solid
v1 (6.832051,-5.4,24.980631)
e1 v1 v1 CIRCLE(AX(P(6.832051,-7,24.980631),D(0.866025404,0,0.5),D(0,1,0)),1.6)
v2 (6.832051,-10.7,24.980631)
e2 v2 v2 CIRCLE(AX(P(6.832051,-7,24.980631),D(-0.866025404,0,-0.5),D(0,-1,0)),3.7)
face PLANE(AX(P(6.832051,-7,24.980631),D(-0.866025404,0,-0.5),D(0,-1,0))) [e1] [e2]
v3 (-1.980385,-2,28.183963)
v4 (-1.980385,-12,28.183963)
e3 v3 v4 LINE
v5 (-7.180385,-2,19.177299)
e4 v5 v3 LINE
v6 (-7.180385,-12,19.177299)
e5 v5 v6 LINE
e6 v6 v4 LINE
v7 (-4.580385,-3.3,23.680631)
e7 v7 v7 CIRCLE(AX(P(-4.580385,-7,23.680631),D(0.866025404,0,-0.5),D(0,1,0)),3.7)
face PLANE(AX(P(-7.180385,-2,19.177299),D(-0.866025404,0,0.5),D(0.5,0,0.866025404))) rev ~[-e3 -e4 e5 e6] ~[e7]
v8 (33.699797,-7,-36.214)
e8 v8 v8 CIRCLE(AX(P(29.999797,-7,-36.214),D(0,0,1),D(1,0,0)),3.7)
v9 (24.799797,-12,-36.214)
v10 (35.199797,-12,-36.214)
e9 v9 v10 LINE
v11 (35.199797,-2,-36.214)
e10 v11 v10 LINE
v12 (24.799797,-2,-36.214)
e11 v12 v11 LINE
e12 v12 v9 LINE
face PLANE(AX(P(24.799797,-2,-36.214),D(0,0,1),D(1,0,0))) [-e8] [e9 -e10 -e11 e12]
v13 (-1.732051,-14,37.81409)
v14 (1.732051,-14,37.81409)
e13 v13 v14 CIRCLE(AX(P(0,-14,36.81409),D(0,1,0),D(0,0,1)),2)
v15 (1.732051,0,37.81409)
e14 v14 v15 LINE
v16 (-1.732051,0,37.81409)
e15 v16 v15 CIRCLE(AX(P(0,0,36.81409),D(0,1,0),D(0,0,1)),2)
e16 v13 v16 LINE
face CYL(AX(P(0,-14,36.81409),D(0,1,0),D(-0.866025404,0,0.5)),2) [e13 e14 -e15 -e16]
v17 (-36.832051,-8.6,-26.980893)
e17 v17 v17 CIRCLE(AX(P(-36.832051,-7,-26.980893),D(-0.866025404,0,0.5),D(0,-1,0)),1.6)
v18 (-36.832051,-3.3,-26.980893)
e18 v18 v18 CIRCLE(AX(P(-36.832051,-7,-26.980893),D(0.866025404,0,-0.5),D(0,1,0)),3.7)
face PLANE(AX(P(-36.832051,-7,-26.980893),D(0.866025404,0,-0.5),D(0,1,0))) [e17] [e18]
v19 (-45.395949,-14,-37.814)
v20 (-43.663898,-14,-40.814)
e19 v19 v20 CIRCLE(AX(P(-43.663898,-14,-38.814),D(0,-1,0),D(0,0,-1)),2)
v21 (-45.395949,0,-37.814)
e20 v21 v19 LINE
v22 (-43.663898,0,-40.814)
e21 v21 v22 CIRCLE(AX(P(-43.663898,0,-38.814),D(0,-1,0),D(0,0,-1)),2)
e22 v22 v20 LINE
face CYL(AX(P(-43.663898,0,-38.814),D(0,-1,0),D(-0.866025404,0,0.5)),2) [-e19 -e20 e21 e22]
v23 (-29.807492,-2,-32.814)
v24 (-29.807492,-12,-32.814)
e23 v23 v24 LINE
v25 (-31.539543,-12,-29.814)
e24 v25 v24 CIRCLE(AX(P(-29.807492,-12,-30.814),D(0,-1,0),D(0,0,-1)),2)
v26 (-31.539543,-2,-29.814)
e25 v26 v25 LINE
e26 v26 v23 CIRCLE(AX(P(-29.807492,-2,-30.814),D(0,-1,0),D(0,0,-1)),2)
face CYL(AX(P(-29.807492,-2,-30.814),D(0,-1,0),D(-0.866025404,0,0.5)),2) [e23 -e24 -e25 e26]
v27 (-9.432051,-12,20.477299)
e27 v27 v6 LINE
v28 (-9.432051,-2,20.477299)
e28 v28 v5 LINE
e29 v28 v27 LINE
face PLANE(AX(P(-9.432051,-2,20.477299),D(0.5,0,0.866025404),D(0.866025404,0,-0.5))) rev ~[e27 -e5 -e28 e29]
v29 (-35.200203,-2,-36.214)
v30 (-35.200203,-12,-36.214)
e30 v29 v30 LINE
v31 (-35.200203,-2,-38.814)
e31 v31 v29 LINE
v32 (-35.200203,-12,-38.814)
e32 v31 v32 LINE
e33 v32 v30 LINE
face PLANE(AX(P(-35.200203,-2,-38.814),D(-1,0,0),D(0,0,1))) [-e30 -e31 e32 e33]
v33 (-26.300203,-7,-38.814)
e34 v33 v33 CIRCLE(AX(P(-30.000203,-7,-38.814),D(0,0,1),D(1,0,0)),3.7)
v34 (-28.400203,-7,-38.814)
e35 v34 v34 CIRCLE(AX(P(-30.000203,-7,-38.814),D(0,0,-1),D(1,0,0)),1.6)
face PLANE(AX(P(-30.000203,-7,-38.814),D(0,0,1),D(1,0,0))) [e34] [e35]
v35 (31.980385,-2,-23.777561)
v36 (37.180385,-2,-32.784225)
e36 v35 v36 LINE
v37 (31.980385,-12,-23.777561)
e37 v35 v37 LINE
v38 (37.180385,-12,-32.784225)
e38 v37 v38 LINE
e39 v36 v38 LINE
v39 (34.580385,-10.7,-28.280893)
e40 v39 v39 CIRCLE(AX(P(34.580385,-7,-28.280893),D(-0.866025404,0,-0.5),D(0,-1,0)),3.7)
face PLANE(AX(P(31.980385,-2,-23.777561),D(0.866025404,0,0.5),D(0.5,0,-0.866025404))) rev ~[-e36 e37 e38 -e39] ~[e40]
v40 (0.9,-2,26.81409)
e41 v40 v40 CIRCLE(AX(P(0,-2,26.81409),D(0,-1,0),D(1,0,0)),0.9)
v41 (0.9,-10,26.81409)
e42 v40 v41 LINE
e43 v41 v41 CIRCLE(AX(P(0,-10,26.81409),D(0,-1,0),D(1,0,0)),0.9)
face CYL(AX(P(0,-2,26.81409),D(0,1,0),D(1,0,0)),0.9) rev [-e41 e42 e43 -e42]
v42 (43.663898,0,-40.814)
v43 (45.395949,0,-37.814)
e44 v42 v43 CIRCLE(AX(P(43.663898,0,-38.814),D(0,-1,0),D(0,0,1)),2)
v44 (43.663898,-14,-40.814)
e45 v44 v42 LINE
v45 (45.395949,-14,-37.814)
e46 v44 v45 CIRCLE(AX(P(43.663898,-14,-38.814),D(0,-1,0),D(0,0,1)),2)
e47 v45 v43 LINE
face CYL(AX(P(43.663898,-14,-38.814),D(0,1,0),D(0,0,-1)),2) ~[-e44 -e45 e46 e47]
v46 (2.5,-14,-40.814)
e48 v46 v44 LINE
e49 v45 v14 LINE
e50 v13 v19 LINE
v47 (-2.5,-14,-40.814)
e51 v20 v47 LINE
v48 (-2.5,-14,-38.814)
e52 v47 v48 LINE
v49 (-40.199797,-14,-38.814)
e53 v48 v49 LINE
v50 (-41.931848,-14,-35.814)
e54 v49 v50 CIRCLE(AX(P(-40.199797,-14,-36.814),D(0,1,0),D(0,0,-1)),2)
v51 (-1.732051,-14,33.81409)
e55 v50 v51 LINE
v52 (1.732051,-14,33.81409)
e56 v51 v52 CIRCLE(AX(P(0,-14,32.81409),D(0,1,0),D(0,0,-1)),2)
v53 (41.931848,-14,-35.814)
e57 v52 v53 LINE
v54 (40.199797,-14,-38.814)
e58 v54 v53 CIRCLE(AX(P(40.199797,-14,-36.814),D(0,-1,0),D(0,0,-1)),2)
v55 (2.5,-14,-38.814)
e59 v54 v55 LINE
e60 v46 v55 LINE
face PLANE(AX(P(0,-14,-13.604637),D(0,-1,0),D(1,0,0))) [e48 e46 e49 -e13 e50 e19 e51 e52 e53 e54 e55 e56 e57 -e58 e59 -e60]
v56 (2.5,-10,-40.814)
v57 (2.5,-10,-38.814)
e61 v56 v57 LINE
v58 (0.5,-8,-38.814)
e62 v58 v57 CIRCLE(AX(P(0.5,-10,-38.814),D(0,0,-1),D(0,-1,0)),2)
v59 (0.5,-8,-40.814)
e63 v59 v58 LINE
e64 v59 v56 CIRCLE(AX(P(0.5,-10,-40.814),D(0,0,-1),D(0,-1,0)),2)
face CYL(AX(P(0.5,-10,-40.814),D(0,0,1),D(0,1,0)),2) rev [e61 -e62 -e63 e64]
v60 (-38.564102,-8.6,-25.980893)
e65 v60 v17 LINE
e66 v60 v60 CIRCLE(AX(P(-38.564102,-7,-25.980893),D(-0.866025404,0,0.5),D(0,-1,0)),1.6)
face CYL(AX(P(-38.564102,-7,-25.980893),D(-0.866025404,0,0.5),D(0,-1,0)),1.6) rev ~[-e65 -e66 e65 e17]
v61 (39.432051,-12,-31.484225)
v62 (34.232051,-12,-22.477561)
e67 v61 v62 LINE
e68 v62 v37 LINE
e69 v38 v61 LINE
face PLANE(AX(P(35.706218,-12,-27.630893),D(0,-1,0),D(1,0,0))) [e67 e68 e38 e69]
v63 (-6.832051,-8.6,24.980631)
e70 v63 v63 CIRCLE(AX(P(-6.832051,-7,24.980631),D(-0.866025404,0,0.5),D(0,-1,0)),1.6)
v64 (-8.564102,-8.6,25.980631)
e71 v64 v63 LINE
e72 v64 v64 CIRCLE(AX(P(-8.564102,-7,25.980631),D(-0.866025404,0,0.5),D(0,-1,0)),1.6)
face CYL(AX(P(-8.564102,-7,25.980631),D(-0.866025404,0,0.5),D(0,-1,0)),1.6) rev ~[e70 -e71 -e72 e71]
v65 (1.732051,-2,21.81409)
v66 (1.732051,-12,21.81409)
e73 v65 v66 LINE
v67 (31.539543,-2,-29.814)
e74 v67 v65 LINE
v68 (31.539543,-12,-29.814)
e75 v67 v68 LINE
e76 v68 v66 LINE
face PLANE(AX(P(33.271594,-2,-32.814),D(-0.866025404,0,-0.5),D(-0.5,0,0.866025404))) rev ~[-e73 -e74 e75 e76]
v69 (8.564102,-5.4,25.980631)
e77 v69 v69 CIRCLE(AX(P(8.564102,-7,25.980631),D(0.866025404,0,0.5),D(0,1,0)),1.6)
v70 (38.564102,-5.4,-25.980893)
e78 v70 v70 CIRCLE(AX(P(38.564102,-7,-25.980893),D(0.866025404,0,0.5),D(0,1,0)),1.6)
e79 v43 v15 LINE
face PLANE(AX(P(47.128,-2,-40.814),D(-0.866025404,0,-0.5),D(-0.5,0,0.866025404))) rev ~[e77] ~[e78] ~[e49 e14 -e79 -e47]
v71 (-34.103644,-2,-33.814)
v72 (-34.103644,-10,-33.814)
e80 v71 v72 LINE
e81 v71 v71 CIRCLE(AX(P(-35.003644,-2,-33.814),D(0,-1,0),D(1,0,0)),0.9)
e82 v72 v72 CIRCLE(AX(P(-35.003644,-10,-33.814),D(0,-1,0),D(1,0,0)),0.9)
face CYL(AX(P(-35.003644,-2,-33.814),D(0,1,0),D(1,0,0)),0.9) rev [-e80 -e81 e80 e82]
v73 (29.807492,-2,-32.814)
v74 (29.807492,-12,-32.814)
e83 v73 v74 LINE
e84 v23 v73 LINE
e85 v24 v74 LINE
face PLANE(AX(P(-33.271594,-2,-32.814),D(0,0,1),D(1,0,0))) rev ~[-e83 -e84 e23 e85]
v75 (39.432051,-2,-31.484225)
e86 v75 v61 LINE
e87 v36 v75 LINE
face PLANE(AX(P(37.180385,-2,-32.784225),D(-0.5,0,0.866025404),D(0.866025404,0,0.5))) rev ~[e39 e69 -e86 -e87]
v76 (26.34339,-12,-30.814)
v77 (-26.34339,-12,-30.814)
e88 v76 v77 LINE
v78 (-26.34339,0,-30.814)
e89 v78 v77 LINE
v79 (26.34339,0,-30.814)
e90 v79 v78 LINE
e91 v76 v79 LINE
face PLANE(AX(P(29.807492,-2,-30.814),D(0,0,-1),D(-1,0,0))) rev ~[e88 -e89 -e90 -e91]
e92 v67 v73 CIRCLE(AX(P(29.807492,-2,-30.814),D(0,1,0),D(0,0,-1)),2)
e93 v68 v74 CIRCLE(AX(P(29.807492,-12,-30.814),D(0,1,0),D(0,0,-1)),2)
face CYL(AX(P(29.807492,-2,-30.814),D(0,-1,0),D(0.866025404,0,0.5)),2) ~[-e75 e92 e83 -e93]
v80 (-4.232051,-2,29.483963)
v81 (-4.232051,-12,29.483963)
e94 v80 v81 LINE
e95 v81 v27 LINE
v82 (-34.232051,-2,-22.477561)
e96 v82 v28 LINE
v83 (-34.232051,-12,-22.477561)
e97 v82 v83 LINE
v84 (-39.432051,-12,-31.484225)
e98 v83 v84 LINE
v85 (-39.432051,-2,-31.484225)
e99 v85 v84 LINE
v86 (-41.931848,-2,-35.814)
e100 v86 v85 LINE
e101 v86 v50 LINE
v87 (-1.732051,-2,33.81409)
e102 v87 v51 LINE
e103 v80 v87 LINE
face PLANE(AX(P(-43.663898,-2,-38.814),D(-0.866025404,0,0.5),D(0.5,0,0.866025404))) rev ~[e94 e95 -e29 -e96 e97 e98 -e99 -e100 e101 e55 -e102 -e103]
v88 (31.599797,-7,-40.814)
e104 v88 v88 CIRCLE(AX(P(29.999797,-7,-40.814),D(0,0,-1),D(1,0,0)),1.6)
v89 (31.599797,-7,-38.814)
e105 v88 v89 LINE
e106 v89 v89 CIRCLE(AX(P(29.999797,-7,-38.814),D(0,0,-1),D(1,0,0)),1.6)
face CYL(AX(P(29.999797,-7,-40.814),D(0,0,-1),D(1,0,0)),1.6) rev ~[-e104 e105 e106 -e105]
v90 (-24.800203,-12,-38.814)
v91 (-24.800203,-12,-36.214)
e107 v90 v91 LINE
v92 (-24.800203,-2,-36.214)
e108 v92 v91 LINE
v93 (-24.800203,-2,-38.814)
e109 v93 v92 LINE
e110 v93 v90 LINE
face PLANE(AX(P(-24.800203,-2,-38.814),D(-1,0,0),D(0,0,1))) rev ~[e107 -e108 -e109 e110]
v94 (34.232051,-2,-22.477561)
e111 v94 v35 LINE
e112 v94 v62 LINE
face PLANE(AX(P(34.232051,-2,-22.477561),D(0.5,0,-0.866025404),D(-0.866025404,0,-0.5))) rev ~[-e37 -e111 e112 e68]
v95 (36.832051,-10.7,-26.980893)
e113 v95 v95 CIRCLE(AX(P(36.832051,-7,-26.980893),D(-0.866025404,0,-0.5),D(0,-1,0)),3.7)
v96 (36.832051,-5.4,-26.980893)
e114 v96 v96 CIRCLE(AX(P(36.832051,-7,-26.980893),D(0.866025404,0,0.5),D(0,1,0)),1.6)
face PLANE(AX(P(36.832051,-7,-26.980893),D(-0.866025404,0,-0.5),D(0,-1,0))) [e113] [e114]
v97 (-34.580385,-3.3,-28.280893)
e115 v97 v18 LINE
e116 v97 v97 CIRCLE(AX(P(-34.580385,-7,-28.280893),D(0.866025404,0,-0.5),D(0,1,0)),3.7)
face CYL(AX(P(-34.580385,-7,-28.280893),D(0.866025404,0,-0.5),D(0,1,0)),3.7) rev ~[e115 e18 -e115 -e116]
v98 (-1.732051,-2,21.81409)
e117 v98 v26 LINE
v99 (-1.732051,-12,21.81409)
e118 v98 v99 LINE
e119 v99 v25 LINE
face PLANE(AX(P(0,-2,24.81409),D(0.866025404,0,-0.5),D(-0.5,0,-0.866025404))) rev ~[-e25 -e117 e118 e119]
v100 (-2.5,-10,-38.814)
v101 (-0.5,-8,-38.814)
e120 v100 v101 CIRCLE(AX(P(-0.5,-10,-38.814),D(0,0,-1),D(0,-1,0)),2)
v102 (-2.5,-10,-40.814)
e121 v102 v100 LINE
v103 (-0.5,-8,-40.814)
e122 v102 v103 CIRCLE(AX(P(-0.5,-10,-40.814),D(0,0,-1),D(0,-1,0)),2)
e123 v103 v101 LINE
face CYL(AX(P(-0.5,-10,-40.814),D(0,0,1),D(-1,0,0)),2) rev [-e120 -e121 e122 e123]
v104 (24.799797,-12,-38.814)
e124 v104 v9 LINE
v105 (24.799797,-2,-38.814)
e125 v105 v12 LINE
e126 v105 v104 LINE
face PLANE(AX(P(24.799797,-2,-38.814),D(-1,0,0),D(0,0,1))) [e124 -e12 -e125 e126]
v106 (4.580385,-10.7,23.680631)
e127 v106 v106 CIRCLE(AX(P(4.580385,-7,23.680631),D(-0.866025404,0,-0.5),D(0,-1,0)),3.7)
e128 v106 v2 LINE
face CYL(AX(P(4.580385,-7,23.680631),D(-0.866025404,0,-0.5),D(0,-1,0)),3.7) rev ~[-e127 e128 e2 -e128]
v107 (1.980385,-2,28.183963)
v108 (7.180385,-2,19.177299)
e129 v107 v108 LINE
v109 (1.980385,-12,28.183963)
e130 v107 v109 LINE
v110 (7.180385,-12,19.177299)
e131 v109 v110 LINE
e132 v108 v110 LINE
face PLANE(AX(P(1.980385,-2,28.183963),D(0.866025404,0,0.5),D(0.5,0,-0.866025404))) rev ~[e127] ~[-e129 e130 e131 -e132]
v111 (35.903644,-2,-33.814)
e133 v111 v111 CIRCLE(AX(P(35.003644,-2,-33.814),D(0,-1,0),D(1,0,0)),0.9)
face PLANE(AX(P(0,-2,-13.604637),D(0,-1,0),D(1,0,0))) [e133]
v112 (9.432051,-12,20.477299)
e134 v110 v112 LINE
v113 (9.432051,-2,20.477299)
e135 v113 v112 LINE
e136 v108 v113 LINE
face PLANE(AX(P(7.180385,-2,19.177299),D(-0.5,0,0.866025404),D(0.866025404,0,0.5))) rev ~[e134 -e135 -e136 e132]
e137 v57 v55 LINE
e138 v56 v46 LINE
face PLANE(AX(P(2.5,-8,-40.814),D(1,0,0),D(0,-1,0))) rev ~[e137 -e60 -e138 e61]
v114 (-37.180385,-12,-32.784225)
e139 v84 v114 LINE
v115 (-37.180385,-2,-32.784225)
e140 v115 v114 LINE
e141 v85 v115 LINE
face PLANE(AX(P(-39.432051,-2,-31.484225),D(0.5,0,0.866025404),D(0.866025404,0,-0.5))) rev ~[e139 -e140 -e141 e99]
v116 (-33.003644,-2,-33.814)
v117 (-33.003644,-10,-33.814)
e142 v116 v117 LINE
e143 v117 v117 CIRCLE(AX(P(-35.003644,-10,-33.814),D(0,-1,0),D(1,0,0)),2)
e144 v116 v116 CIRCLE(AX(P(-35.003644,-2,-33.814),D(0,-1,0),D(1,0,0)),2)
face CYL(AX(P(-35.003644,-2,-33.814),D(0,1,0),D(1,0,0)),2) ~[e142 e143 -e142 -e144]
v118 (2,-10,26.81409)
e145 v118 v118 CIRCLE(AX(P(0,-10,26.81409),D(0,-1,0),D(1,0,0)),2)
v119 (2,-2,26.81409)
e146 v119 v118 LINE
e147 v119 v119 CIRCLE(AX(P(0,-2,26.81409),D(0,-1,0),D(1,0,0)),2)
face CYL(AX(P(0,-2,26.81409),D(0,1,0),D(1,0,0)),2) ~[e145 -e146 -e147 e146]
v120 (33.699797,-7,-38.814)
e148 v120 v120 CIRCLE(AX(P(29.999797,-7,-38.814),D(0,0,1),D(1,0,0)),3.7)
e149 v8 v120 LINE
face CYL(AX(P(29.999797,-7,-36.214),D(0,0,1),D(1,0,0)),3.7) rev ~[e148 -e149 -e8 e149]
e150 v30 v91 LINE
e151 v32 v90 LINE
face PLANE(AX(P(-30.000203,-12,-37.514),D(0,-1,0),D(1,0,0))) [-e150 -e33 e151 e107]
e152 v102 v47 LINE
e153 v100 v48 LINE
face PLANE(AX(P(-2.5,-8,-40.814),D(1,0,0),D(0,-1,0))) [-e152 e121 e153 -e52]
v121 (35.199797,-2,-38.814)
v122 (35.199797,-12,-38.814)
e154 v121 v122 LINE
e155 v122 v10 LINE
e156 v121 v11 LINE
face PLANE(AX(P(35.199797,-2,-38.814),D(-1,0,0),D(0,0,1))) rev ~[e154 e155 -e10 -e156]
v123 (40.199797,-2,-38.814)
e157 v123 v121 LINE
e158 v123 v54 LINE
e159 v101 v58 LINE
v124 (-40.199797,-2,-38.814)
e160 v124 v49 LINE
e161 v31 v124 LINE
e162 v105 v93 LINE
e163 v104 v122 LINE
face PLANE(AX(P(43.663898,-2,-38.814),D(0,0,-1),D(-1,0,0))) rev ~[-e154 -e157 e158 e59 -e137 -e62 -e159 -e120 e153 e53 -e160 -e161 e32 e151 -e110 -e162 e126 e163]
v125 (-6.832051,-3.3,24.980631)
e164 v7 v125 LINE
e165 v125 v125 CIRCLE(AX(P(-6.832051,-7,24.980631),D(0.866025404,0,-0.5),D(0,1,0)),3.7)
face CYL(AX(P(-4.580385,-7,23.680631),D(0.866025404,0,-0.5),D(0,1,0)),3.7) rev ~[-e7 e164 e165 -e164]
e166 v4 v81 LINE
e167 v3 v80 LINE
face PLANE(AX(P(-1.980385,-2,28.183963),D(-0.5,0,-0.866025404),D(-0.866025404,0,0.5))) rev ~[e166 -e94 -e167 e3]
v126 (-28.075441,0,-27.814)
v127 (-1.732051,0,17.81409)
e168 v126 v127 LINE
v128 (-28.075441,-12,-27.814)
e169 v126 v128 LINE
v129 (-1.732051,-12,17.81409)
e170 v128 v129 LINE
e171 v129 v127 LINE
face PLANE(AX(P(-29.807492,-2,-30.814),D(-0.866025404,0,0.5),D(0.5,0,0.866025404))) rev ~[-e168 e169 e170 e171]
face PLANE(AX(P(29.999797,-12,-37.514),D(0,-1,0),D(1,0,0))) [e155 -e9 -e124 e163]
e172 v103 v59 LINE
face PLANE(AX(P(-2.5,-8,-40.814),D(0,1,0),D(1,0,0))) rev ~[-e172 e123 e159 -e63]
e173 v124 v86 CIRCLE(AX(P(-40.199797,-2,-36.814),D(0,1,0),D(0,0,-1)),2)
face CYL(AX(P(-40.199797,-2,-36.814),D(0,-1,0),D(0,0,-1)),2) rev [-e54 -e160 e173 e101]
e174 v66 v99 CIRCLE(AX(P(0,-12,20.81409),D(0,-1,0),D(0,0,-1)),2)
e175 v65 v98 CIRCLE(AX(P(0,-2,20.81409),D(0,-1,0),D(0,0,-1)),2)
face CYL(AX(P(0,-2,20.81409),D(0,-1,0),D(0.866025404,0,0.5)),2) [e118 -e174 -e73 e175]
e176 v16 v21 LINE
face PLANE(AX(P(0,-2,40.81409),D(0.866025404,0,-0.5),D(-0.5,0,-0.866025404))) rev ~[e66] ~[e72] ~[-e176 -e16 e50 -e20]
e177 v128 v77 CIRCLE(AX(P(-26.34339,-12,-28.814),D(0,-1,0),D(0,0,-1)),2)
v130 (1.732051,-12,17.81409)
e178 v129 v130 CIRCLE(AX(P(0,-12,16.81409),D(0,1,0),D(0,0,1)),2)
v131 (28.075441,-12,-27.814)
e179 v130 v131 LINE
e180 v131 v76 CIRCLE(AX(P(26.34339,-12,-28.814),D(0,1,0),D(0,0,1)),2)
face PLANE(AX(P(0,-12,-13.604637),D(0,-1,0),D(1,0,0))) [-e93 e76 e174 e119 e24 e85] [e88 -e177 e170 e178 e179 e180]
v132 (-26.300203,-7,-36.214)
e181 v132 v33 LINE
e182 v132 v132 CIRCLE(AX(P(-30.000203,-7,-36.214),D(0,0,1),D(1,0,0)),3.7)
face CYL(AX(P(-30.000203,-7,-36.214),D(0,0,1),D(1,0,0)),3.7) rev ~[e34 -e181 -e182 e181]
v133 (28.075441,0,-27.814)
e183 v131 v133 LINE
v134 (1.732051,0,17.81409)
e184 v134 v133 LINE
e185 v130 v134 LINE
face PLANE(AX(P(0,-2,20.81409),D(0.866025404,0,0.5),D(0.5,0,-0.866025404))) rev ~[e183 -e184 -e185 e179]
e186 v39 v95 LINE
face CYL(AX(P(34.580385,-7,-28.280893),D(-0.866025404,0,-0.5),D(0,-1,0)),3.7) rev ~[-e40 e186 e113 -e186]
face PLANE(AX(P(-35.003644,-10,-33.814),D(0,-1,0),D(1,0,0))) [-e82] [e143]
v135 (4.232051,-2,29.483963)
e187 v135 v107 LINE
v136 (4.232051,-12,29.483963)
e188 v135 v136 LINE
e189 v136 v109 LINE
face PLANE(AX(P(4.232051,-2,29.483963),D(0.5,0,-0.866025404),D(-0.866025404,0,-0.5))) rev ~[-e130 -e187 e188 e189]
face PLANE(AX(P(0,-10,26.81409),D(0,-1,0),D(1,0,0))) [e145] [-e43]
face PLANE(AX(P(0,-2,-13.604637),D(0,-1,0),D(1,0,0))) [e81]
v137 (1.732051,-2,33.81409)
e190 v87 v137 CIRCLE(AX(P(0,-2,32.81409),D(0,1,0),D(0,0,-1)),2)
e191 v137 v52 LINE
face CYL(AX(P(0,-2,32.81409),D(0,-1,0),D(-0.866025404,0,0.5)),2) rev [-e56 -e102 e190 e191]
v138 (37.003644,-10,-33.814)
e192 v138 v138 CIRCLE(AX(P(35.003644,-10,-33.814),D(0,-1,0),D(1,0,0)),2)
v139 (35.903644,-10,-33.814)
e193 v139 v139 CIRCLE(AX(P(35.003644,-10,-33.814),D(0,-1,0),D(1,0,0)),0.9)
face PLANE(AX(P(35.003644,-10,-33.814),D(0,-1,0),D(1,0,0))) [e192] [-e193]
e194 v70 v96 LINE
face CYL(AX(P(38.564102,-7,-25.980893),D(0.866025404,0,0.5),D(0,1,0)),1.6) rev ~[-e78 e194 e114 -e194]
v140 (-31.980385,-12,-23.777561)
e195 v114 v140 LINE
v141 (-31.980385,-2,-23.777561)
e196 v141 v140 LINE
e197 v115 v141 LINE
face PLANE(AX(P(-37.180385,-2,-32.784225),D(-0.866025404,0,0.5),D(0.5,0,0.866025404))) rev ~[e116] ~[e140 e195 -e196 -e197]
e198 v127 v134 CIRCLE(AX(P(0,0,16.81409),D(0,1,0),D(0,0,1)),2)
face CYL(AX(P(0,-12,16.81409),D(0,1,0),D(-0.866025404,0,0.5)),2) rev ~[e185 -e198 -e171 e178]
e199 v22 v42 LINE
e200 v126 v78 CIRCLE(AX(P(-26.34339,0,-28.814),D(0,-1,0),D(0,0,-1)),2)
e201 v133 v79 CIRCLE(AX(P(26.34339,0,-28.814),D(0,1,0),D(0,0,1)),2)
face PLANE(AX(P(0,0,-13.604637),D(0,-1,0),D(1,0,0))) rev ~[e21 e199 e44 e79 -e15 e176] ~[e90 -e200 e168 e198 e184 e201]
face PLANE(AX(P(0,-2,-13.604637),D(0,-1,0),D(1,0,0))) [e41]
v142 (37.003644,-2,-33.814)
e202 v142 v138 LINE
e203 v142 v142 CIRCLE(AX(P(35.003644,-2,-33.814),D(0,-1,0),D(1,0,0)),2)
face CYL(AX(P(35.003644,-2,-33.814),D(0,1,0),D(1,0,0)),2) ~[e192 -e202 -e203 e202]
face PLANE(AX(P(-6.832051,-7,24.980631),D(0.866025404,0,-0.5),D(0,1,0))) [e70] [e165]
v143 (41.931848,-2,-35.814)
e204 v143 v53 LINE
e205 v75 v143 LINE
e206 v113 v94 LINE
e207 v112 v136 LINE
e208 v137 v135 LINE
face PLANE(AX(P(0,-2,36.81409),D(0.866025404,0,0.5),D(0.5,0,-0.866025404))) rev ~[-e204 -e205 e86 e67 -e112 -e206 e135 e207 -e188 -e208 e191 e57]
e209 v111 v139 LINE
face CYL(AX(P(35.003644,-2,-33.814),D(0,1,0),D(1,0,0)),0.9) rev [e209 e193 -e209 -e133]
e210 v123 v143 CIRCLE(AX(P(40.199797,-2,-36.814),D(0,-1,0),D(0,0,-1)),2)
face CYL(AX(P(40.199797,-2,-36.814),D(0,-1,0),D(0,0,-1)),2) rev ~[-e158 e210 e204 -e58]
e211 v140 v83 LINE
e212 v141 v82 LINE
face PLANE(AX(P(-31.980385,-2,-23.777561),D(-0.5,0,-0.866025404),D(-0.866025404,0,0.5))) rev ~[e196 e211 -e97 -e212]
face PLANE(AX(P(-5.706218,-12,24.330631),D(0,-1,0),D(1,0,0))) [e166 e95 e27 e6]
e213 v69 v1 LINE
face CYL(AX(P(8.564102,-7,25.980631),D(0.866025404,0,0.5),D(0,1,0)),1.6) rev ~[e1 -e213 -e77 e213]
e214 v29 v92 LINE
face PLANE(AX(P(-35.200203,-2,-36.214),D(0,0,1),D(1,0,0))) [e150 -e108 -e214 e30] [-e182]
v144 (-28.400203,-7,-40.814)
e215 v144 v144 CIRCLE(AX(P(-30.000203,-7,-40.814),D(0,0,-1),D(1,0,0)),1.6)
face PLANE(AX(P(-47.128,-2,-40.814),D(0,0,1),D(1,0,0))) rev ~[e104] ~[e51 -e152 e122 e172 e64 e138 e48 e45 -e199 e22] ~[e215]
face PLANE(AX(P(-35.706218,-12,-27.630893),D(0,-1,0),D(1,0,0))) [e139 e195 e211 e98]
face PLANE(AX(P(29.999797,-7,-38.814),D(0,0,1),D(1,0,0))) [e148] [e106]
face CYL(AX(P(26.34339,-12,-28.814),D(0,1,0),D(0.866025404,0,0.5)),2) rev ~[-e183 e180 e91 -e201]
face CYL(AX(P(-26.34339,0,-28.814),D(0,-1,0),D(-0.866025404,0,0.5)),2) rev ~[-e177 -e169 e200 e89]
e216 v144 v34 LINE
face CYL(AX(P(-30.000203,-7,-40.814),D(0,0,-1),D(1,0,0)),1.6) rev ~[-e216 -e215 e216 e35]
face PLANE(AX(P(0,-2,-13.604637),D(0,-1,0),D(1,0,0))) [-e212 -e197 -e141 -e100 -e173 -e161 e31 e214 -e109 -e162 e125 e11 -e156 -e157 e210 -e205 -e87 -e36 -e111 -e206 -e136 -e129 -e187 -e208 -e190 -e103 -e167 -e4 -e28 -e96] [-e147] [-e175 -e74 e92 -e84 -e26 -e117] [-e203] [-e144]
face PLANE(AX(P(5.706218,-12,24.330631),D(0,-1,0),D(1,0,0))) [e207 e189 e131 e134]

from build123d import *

# Parameters (mm, degrees)
F1_DEPTH  = 2
F3_DEPTH  = 12
F5_DEPTH  = 10
F6_R      = 2
F7_W      = 10.4
F7_H      = 2.6
F8_DEPTH  = 10
F9_W      = 5
F9_H      = 6
F9_R      = 1.6
F10_DEPTH = 5
F11_R     = 1.6
F12_DEPTH = 5
F13_R     = 1.6
F14_DEPTH = 5
F15_R     = 2
F16_R     = 3.7
F17_DEPTH = 2.6
F18_R     = 3.7
F19_DEPTH = 2.6
F20_R     = 3.7
F21_DEPTH = 2.6
F22_R     = 2
F22_R_2   = 0.9
F23_DEPTH = 8


# Not quite as in the source:
# - a feature names something its author has since deleted; it is built from what else it names


with BuildPart() as f1:
    # F0 (on Front) → F1 (new body)
    with BuildSketch(Plane.XZ):
        Polygon((47.128, -40.814), (0, 40.8140904591), (-47.128, -40.814), align=None)
        Polygon((-29.8074919243, -30.814), (0, 20.8140904591), (29.8074919243, -30.814), align=None, mode=Mode.SUBTRACT)
    extrude(amount=F1_DEPTH)

    # F2 (on face) → F3 (join)
    with BuildSketch(Plane.XZ.offset(2)):
        Polygon((0, 40.8140904591), (-47.128, -40.814), (47.128, -40.814), align=None)
        Polygon((43.6638983849, -38.814), (-43.6638983849, -38.814), (0, 36.8140904591), align=None, mode=Mode.SUBTRACT)
    extrude(amount=F3_DEPTH)

    # F4 (on face) → F5 (join)
    with BuildSketch(Plane.XZ.offset(2)):
        Polygon((33.2715935394, -32.814), (0, 24.8140904591), (-33.2715935394, -32.814), align=None)
        Polygon((-29.8074919243, -30.814), (0, 20.8140904591), (29.8074919243, -30.814), align=None, mode=Mode.SUBTRACT)
    extrude(amount=F5_DEPTH)

    # F6
    f6_edges = [f1.edges().sort_by_distance(p)[0] for p in [
        (47.128, -7, -40.814),
        (-47.128, -7, -40.814),
        (0, -7, 40.81409),
        (-29.807492, -6, -30.814),
        (-43.663898, -8, -38.814),
        (0, -7, 24.81409),
        (0, -6, 20.81409),
        (0, -8, 36.81409),
        (33.271594, -7, -32.814),
        (-33.271594, -7, -32.814),
        (29.807492, -6, -30.814),
        (43.663898, -8, -38.814),
    ]]
    fillet(f6_edges, radius=F6_R)

    # F7 (on face) → F8 (join)
    with BuildSketch(Plane.XZ.offset(2)):
        Polygon((-31.9803847577, -23.7775607869), (-34.2320508076, -22.4775607869), (-39.4320508076, -31.4842249862), (-37.1803847577, -32.7842249862), align=None)
        Polygon((-9.4320508076, 20.4772992408), (-7.1803847577, 19.1772992408), (-1.9803847577, 28.1839634402), (-4.2320508076, 29.4839634402), align=None)
        Polygon((9.4320508076, 20.4772992408), (4.2320508076, 29.4839634402), (1.9803847577, 28.1839634402), (7.1803847577, 19.1772992408), align=None)
        Polygon((39.4320508076, -31.4842249862), (34.2320508076, -22.4775607869), (31.9803847577, -23.7775607869), (37.1803847577, -32.7842249862), align=None)
        with Locations((29.9997967697, -37.514)):
            Rectangle(F7_W, F7_H)
        with Locations((-30.0002032303, -37.514)):
            Rectangle(F7_W, F7_H)
    extrude(amount=F8_DEPTH)

    # F9 (on face) → F10 (cut)
    with BuildSketch(Plane(origin=(0, 0, -40.814), x_dir=(1, 0, 0), z_dir=(0, 0, -1))):
        with Locations((0, 11)):
            Rectangle(F9_W, F9_H)
        with Locations((-30.0002032303, 7)):
            Circle(F9_R)
        with Locations((29.9997967697, 7)):
            Circle(F9_R)
    extrude(amount=-F10_DEPTH, mode=Mode.SUBTRACT)

    # F11 (on face) → F12 (cut)
    with BuildSketch(Plane(origin=(17.673019585, 0, 10.2035226148), x_dir=(0, 1, 0), z_dir=(0.8660254038, 0, 0.5))):
        with Locations((-7, 18.2178359397)):
            Circle(F11_R)
        with Locations((-7, -41.7821640603)):
            Circle(F11_R)
    extrude(amount=-F12_DEPTH, mode=Mode.SUBTRACT)

    # F13 (on face) → F14 (cut)
    with BuildSketch(Plane(origin=(-17.673019585, 0, 10.2035226148), x_dir=(0, -1, 0), z_dir=(-0.8660254038, 0, 0.5))):
        with Locations((7, 18.2178359397)):
            Circle(F13_R)
        with Locations((7, -41.7821640603)):
            Circle(F13_R)
    extrude(amount=-F14_DEPTH, mode=Mode.SUBTRACT)

    # F15
    f15_edges = [f1.edges().sort_by_distance(p)[0] for p in [
        (-2.5, -8, -39.814),
        (2.5, -8, -39.814),
    ]]
    fillet(f15_edges, radius=F15_R)

    # F16 (on face) → F17 (cut)
    with BuildSketch(Plane.XY.offset(-36.214)):
        with Locations((29.9997967697, -7)):
            Circle(F16_R)
        with Locations((-30.0002032303, -7)):
            Circle(F16_R)
    extrude(amount=-F17_DEPTH, mode=Mode.SUBTRACT)

    # F18 (on face) → F19 (cut)
    with BuildSketch(Plane(origin=(13.6893027276, 0, 7.9035226148), x_dir=(0, -1, 0), z_dir=(-0.8660254038, 0, -0.5))):
        with Locations((7, -41.7821640603)):
            Circle(F18_R)
        with Locations((7, 18.2178359397)):
            Circle(F18_R)
    extrude(amount=-F19_DEPTH, mode=Mode.SUBTRACT)

    # F20 (on face) → F21 (cut)
    with BuildSketch(Plane(origin=(-13.6893027276, 0, 7.9035226148), x_dir=(0, 1, 0), z_dir=(0.8660254038, 0, -0.5))):
        with Locations((-7, -41.7821640603)):
            Circle(F20_R)
        with Locations((-7, 18.2178359397)):
            Circle(F20_R)
    extrude(amount=-F21_DEPTH, mode=Mode.SUBTRACT)

    # F22 (on face) → F23 (join)
    with BuildSketch(Plane.XZ.offset(2)):
        with Locations((0, 26.8140904591)):
            Circle(F22_R)
        with Locations((0, 26.8140904591)):
            Circle(F22_R_2, mode=Mode.SUBTRACT)
        with Locations((35.003644347, -33.814)):
            Circle(F22_R)
        with Locations((35.003644347, -33.814)):
            Circle(F22_R_2, mode=Mode.SUBTRACT)
        with Locations((-35.003644347, -33.814)):
            Circle(F22_R)
        with Locations((-35.003644347, -33.814)):
            Circle(F22_R_2, mode=Mode.SUBTRACT)
    extrude(amount=F23_DEPTH)


solid = f1.part
